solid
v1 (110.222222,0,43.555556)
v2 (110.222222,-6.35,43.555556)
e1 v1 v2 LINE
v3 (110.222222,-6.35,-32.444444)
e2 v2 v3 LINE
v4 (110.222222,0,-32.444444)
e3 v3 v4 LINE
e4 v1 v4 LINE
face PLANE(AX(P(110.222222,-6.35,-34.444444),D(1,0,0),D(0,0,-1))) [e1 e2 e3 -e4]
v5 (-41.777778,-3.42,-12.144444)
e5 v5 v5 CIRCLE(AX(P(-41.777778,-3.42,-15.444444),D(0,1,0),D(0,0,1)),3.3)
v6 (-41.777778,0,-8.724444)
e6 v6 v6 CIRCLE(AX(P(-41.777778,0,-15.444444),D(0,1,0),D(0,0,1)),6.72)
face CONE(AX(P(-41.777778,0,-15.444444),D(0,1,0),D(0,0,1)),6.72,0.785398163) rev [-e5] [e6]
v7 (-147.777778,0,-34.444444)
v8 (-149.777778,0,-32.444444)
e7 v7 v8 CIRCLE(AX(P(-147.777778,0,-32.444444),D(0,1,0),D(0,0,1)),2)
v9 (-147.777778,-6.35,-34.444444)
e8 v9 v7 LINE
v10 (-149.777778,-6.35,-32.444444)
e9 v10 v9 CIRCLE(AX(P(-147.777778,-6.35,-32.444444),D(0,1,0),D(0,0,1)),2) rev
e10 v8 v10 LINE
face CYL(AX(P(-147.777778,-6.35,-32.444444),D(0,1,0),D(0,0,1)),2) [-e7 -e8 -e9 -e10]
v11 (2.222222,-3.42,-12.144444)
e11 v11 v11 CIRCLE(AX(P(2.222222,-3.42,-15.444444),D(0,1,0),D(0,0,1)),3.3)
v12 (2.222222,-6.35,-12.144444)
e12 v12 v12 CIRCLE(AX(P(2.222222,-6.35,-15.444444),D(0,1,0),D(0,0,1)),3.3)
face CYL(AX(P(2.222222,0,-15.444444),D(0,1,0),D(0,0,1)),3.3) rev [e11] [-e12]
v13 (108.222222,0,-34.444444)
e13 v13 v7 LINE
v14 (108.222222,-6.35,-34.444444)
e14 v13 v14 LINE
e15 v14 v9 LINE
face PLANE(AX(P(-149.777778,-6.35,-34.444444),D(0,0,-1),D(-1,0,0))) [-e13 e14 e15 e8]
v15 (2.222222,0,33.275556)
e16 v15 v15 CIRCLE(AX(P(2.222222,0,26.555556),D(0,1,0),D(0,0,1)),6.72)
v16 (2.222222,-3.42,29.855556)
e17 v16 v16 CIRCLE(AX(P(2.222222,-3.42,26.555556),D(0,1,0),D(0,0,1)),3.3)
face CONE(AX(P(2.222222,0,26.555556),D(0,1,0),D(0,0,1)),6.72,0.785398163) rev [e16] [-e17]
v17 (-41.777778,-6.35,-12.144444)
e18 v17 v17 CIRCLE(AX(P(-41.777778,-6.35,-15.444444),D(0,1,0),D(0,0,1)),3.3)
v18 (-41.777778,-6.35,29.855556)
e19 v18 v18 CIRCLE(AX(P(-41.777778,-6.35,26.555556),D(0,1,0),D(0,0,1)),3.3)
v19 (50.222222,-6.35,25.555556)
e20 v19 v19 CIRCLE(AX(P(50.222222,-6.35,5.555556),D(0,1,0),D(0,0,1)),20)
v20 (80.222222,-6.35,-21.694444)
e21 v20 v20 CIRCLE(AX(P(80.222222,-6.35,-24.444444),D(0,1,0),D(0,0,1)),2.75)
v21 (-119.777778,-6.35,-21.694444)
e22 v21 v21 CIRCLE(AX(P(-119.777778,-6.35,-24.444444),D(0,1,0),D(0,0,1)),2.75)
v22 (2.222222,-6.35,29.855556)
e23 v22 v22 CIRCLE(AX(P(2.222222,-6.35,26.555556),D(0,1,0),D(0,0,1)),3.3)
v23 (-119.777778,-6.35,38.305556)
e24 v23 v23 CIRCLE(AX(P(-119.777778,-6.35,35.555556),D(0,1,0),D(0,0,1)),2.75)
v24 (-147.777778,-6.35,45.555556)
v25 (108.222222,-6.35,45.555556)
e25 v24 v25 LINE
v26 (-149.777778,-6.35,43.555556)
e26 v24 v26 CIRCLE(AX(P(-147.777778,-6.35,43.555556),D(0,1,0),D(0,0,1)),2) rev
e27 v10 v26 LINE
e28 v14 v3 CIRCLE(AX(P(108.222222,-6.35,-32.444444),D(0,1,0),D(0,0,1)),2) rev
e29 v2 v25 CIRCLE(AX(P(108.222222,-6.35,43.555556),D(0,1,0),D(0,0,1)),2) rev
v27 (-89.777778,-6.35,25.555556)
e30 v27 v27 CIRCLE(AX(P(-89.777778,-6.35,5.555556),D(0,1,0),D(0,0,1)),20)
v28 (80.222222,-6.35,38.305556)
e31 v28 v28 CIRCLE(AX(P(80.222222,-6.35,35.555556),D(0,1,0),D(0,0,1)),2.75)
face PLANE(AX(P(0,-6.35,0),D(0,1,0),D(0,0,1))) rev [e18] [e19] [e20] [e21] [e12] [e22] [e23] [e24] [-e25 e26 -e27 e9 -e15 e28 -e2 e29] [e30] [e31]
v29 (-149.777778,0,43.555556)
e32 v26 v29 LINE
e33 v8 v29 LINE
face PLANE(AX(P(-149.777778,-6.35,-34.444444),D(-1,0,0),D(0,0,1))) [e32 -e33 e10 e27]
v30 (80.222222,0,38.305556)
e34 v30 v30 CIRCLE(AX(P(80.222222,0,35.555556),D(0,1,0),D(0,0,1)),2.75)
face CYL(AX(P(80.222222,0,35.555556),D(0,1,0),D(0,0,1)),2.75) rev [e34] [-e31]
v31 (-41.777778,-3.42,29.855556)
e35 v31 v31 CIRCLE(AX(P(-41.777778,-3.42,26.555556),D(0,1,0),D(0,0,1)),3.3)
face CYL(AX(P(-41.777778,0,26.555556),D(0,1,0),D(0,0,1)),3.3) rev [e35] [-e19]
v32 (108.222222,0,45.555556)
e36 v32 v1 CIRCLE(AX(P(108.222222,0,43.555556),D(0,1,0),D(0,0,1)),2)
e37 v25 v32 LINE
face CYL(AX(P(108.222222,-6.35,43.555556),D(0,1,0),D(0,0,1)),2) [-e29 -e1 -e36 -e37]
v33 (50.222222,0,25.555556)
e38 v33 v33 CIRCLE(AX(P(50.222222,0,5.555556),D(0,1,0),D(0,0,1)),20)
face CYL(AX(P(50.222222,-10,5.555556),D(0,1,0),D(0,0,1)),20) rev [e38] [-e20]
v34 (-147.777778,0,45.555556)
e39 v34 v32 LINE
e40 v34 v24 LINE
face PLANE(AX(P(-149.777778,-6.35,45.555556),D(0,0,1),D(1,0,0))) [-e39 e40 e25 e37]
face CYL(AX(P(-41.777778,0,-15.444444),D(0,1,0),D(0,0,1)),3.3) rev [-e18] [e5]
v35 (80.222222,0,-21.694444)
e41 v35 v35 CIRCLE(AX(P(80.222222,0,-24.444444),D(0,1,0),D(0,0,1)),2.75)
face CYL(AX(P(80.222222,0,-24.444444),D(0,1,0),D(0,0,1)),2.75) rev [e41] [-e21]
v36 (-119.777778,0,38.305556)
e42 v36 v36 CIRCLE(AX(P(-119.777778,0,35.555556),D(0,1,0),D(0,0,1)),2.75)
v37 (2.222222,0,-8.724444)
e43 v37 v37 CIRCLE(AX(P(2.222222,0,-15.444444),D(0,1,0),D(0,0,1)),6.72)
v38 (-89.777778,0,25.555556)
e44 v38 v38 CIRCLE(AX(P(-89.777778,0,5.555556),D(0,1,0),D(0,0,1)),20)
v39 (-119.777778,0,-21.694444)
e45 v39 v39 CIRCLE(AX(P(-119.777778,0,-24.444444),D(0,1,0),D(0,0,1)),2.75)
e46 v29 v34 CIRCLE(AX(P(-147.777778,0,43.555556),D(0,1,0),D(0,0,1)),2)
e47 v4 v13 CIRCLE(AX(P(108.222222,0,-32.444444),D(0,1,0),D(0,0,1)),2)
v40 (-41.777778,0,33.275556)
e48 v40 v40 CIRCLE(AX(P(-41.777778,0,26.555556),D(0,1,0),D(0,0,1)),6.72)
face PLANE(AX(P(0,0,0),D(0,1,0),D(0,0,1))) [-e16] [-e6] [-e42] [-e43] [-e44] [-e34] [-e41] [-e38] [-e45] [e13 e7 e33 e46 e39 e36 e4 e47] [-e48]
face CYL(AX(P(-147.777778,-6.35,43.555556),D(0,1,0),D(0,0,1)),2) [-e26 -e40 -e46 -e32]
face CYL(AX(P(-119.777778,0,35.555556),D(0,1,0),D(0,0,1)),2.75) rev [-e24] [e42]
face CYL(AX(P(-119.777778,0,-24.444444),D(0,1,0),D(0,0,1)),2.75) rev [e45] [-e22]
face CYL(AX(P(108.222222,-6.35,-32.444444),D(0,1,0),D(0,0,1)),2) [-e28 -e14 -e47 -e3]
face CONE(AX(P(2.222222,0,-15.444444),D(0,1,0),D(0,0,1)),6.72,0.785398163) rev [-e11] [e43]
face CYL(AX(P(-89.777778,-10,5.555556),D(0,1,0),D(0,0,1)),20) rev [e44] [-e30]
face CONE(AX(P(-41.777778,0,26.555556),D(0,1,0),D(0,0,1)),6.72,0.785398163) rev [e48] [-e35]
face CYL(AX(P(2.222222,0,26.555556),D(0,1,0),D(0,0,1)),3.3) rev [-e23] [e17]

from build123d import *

# Parameters (mm, degrees)
CROQUIS1_W                                   = 260
CROQUIS1_H                                   = 80
BRIDA_BASE1_DEPTH                            = 6.35
REDONDEO1_R                                  = 2
TALADRO_DE_MARGEN_PARA_M51_D                 = 5.5
REFRENTADO_PARA_TORNILLO_TAP_N_CON_C_2_COUNT = 2
REFRENTADO_PARA_TORNILLO_TAP_N_CON_C_2_PITCH = 44
REFRENTADO_PARA_TORNILLO_TAP_N_CON_C_3_COUNT = 2
REFRENTADO_PARA_TORNILLO_TAP_N_CON_C_3_PITCH = 60.827625303
REFRENTADO_PARA_TORNILLO_TAP_N_CON_C_4_COUNT = 2
REFRENTADO_PARA_TORNILLO_TAP_N_CON_C_4_PITCH = 42
CROQUIS11_R                                  = 20
CORTAR_EXTRUIR1_DEPTH                        = 10


# Sheet-metal steps are written as plain solids
with BuildPart() as part:
    # Croquis1 → Brida base1 (new body)
    with BuildSketch(Plane(origin=(0, 0, 0), x_dir=(1, 0, 0), z_dir=(0, 1, 0))):
        with Locations((-19.777777778, -5.555555556)):
            Rectangle(CROQUIS1_W, CROQUIS1_H)
    extrude(amount=-BRIDA_BASE1_DEPTH)

    # Redondeo1
    redondeo1_edges = [part.edges().sort_by_distance(p)[0] for p in [
        (-149.777777778, -3.175, -34.444444444),
        (110.222222222, -3.175, -34.444444444),
        (110.222222222, -3.175, 45.555555556),
        (-149.777777778, -3.175, 45.555555556),
    ]]
    fillet(redondeo1_edges, radius=REDONDEO1_R)

    # Taladro de margen para M51 (through all)
    with Locations(Plane(origin=(0, 0, 0), x_dir=(1, 0, 0), z_dir=(0, 1, 0))):
        with Locations((-119.777777778, 24.444444444), (-119.777777778, -35.555555556), (80.222222222, -35.555555556), (80.222222222, 24.444444444)):
            Hole(TALADRO_DE_MARGEN_PARA_M51_D / 2)

    # Croquis9 → Refrentado para tornillo tapón con cabeza plana de clavija de M61 (revolve, cut)
    with BuildSketch(Plane(origin=(-41.777777778, 0, -15.444444444), x_dir=(0, 0, 1), z_dir=(1, 0, 0))):
        Polygon((0, 0), (0, 6.35), (3.3, 6.35), (3.3, 3.42), (6.72, 0), align=None)
    refrentado_para_tornillo_tap_n_con_cabez = revolve(axis=Axis((-41.777777778, 6.35, -15.444444444), (0, -1, 0)), mode=Mode.SUBTRACT)

    # Refrentado para tornillo tap_n con c 2: Refrentado para tornillo tapón con cabeza plana de clavija de M61 ×2
    with Locations(*[(i * REFRENTADO_PARA_TORNILLO_TAP_N_CON_C_2_PITCH, 0, 0) for i in range(1, REFRENTADO_PARA_TORNILLO_TAP_N_CON_C_2_COUNT)]):
        add(refrentado_para_tornillo_tap_n_con_cabez, mode=Mode.SUBTRACT)

    # Refrentado para tornillo tap_n con c 3: Refrentado para tornillo tapón con cabeza plana de clavija de M61 ×2
    with Locations(*[Vector(0.7233555441435721, 0, 0.6904757466825007) * (i * REFRENTADO_PARA_TORNILLO_TAP_N_CON_C_3_PITCH) for i in range(1, REFRENTADO_PARA_TORNILLO_TAP_N_CON_C_3_COUNT)]):
        add(refrentado_para_tornillo_tap_n_con_cabez, mode=Mode.SUBTRACT)

    # Refrentado para tornillo tap_n con c 4: Refrentado para tornillo tapón con cabeza plana de clavija de M61 ×2
    with Locations(*[(0, 0, i * REFRENTADO_PARA_TORNILLO_TAP_N_CON_C_4_PITCH) for i in range(1, REFRENTADO_PARA_TORNILLO_TAP_N_CON_C_4_COUNT)]):
        add(refrentado_para_tornillo_tap_n_con_cabez, mode=Mode.SUBTRACT)

    # Croquis11 → Cortar-Extruir1 (cut)
    with BuildSketch(Plane(origin=(0, 0, 0), x_dir=(1, 0, 0), z_dir=(0, 1, 0))):
        with Locations(Location((-89.777777778, -5.555555556, 0), (0, 0, 270))):
            Circle(CROQUIS11_R)
        with Locations(Location((50.222222222, -5.555555556, 0), (0, 0, 270))):
            Circle(CROQUIS11_R)
    extrude(amount=-CORTAR_EXTRUIR1_DEPTH, mode=Mode.SUBTRACT)


solid = part.part
